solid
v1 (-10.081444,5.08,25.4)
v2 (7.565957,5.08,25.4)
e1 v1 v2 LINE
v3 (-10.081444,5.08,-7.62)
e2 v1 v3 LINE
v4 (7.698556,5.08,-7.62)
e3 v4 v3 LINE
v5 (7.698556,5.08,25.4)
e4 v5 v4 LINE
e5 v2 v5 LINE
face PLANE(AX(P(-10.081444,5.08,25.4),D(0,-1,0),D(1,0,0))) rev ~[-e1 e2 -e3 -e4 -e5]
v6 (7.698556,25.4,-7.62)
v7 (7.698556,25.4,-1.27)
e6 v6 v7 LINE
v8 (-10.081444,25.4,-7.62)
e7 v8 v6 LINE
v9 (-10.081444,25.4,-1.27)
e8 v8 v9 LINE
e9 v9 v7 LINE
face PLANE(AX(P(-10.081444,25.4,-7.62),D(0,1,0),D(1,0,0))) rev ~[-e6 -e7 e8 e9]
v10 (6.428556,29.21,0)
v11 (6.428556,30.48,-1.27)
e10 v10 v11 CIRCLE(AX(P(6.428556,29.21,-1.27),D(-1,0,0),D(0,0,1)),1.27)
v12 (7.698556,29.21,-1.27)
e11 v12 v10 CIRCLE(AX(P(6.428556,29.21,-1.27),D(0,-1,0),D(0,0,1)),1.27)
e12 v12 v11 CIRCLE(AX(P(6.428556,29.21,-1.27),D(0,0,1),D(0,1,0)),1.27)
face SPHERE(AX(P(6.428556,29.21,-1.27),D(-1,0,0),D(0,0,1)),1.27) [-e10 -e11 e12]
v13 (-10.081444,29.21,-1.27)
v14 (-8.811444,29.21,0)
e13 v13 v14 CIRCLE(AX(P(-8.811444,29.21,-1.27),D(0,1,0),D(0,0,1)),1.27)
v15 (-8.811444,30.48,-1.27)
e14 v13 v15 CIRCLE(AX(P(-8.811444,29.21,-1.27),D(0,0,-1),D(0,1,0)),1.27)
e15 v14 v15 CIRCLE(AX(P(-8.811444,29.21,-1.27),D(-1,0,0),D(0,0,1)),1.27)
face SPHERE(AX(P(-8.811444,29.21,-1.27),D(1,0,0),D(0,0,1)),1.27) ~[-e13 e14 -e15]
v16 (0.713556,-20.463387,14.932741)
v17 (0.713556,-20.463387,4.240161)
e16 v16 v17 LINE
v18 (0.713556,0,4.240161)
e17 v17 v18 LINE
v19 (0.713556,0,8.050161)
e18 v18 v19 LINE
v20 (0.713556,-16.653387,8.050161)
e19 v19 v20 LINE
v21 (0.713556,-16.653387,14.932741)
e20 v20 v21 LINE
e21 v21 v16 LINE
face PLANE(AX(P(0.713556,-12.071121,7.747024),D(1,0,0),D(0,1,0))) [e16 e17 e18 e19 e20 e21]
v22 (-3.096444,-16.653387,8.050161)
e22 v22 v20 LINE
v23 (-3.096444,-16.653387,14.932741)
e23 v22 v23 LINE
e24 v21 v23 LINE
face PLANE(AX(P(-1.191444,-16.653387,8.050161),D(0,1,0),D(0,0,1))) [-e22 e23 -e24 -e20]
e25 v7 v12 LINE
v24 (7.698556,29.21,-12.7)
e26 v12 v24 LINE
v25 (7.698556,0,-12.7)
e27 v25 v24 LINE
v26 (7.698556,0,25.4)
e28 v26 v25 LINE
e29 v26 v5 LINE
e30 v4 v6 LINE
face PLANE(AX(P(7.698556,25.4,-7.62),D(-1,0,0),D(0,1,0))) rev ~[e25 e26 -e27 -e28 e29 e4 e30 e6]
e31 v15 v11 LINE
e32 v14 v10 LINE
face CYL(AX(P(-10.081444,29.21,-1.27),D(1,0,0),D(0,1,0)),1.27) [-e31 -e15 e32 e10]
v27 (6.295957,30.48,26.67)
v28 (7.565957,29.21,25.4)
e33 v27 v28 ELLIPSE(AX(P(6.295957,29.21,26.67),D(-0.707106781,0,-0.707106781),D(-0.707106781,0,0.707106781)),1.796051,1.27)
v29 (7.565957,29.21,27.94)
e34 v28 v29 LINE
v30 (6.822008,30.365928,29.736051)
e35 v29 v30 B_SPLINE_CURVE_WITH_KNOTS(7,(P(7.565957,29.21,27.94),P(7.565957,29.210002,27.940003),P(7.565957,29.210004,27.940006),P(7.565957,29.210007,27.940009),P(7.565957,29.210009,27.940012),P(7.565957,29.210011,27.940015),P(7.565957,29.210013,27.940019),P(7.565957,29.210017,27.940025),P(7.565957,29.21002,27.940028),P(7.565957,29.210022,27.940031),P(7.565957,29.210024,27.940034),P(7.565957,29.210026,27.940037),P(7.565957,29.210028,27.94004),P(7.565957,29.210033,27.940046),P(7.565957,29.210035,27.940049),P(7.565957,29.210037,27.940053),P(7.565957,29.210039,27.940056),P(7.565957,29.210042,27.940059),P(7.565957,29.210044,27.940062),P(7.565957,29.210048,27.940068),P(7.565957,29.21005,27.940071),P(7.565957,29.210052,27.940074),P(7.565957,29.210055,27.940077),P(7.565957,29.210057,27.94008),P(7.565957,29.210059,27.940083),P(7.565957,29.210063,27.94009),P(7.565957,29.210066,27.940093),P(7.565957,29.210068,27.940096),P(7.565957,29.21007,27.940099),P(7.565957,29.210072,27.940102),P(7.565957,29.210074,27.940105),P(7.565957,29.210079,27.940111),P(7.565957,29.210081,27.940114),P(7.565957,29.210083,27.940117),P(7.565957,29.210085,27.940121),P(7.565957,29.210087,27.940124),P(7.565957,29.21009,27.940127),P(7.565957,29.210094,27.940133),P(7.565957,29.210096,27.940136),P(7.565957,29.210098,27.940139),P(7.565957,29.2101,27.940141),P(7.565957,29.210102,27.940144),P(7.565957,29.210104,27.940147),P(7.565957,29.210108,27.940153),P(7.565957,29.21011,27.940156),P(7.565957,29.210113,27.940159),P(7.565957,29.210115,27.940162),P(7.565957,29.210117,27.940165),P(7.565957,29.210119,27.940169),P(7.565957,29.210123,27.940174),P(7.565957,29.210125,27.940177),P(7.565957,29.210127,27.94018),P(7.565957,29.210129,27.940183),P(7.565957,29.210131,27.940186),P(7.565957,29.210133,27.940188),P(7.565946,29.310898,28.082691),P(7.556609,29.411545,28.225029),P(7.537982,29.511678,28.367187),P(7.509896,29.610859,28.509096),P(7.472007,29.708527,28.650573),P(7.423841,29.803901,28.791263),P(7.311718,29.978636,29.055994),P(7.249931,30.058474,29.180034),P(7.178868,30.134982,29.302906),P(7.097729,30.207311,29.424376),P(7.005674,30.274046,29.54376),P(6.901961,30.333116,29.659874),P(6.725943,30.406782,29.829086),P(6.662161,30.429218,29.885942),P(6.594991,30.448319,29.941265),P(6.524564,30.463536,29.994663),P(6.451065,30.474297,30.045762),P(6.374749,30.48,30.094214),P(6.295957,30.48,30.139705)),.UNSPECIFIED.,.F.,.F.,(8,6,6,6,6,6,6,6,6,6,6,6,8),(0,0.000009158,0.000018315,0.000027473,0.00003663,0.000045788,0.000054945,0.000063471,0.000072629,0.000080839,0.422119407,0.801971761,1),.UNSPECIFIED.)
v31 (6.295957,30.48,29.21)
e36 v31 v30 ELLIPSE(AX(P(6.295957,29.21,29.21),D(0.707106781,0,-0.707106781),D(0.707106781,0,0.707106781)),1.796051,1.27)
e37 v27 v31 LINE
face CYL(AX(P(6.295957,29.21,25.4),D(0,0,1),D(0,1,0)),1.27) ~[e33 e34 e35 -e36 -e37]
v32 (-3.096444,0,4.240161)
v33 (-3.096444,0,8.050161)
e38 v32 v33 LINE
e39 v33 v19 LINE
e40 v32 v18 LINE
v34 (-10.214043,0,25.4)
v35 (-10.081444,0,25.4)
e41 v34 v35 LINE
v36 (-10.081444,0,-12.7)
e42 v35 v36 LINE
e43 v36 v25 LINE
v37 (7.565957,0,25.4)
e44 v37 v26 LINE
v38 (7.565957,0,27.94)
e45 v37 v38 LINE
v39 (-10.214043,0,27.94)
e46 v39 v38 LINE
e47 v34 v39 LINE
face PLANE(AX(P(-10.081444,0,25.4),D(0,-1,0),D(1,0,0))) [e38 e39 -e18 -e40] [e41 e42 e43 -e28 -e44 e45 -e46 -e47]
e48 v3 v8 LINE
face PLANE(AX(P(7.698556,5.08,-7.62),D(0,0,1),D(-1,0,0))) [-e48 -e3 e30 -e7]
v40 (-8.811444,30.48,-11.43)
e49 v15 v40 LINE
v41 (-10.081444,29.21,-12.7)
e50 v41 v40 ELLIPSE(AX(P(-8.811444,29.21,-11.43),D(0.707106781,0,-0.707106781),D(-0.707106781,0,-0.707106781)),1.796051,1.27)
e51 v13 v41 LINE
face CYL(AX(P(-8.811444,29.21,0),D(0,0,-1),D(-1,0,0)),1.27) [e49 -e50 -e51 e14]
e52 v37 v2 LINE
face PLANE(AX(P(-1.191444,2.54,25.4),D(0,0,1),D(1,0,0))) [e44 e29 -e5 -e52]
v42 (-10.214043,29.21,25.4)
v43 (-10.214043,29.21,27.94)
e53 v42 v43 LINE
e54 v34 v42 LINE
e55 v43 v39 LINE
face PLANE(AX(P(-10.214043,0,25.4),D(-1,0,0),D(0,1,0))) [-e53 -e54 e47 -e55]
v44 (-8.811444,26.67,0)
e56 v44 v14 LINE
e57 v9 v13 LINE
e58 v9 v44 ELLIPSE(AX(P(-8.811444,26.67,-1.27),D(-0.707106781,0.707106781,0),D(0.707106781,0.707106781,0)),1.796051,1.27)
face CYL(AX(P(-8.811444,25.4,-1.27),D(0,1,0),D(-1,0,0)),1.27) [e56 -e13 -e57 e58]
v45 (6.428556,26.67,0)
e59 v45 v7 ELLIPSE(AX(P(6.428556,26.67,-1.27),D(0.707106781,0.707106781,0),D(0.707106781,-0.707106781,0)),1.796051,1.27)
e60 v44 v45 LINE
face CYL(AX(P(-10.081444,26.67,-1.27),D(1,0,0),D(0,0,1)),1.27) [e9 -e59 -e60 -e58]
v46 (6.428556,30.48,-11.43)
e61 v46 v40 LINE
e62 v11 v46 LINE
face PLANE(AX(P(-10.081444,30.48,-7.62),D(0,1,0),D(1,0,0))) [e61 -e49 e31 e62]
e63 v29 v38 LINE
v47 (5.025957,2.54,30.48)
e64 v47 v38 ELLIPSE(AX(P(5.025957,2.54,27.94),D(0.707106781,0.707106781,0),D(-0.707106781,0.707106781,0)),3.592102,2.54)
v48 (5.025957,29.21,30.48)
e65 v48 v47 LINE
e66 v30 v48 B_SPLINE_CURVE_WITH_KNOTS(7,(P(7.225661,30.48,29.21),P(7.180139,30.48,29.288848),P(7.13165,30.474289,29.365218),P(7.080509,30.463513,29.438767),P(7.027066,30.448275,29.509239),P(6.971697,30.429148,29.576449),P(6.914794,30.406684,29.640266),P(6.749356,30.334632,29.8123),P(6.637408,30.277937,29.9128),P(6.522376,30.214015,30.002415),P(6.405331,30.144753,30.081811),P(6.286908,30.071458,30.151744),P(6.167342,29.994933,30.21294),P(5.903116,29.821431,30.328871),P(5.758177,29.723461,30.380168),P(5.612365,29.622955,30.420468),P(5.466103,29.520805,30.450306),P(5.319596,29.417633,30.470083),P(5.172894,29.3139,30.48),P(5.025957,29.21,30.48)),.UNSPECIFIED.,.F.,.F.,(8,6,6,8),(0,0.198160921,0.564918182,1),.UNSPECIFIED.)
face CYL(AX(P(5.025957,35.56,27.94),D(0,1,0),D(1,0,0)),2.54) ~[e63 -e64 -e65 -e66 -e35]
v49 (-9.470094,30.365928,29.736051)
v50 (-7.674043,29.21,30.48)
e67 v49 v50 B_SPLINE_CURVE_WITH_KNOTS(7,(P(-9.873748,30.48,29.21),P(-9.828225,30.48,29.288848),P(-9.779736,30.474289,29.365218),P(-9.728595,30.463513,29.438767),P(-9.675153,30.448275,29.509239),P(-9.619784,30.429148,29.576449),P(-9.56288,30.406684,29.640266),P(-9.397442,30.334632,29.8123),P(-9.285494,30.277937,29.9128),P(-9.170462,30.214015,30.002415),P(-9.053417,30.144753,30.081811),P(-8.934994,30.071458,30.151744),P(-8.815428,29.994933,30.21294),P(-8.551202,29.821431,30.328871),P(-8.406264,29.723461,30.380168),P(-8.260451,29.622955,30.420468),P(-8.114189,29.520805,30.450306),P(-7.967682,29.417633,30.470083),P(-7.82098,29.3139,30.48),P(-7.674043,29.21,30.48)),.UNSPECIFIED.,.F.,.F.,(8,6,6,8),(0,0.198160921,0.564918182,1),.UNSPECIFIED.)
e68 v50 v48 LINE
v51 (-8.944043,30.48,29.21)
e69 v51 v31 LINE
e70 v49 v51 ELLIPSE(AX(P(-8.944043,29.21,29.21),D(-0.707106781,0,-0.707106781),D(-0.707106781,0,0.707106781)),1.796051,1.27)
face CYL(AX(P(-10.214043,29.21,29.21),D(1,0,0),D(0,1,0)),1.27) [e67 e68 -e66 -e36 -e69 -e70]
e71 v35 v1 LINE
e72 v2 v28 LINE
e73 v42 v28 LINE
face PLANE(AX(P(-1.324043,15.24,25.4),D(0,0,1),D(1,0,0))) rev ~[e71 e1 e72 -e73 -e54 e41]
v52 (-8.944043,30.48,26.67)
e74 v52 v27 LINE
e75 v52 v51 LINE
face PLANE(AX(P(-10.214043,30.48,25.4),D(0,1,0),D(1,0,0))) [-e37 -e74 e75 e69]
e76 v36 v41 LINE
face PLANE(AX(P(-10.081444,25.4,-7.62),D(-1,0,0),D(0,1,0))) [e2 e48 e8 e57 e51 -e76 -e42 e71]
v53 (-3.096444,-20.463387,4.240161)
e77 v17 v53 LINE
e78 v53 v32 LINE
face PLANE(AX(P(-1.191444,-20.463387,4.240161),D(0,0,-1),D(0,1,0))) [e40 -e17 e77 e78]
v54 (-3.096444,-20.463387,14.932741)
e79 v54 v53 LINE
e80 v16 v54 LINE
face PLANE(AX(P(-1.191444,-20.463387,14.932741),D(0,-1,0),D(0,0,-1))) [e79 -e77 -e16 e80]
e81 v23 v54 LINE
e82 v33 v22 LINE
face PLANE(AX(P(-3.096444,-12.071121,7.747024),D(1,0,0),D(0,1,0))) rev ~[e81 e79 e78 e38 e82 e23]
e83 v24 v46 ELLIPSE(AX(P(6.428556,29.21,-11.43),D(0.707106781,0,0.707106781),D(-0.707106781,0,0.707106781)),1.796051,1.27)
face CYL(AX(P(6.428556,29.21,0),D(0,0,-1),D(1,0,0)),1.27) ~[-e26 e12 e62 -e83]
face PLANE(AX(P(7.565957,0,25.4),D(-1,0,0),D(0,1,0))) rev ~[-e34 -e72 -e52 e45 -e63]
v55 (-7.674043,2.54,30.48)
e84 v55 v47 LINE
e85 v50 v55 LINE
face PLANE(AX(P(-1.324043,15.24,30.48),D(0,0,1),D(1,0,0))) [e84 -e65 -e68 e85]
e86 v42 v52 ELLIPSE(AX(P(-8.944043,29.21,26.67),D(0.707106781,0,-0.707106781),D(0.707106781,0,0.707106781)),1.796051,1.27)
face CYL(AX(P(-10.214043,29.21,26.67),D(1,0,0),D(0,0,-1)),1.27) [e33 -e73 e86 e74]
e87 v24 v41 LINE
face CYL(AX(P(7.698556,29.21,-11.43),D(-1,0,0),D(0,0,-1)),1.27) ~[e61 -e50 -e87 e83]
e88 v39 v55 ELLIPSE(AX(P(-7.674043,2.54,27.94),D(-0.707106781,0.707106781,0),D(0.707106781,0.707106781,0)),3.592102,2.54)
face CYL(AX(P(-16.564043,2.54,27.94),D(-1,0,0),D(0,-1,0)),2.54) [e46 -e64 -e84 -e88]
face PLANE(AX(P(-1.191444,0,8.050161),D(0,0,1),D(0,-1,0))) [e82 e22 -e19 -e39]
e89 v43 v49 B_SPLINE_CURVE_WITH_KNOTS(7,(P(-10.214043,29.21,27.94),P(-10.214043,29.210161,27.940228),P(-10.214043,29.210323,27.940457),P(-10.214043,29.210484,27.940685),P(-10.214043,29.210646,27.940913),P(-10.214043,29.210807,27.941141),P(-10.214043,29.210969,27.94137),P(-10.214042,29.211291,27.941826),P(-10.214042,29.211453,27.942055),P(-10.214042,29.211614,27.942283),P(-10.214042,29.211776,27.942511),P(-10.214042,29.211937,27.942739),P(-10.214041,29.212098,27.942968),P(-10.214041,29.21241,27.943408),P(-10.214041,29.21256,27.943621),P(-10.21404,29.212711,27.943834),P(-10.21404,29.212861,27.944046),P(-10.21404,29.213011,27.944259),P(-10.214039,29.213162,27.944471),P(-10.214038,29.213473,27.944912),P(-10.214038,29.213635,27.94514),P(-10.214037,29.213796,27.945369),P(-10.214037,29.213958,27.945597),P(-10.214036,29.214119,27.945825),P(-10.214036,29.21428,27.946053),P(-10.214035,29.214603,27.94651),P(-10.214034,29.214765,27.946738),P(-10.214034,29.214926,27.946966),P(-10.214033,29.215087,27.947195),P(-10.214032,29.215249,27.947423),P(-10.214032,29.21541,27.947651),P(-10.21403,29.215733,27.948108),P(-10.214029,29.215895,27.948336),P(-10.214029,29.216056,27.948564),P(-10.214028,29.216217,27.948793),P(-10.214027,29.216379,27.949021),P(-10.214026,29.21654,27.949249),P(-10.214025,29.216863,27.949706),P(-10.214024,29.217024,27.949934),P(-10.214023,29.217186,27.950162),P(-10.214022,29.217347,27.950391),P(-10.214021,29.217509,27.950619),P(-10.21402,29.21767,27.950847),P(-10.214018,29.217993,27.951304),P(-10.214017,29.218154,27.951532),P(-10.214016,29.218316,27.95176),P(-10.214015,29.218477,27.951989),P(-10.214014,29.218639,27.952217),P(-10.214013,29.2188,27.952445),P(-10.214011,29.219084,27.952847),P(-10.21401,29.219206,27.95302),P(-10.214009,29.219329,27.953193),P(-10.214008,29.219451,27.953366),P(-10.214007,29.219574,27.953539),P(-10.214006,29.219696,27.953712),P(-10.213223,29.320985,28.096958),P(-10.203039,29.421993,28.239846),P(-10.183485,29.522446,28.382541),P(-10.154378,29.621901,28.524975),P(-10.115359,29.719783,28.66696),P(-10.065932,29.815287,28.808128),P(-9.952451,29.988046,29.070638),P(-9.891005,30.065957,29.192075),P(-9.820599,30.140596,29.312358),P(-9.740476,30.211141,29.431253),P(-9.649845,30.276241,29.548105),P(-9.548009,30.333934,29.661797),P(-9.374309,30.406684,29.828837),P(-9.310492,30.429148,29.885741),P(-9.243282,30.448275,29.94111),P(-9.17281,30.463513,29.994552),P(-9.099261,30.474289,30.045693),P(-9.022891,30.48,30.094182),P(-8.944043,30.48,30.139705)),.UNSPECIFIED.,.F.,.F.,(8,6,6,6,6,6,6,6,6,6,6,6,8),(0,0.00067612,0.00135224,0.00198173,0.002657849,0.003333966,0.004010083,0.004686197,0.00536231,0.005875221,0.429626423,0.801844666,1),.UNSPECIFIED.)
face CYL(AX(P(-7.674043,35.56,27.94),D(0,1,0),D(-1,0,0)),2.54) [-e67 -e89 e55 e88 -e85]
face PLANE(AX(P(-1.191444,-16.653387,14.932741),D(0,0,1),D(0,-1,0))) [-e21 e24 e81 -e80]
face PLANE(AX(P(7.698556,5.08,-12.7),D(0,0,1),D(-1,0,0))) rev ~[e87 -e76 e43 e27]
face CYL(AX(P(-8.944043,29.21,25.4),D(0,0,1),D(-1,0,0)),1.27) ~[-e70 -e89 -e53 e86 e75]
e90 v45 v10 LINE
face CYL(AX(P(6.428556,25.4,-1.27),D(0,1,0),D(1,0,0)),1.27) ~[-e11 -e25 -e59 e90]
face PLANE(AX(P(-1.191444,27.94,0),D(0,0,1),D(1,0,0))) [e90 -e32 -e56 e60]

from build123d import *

# Parameters (mm, degrees)
F1_W         = 17.78
F1_H         = 30.48
F2_DEPTH     = 5.08
F3_W         = 17.78
F3_H         = 5.08
F4_DEPTH     = 38.1
F6_W         = 17.78
F6_H         = 5.08
F7_DEPTH     = 25.4
F9_W         = 17.78
F9_H         = 5.08
F10_DEPTH    = 7.62
F11_R        = 1.27
F12_R        = 1.27
F13_T1_DEPTH = 41.91
F13_T3_DEPTH = 30.48
F16_DEPTH    = 1.905


# Not quite as in the source:
# - a fillet or chamfer that OpenCascade refuses, or shapes differently, is made with other operations: its cross-section is extruded or revolved along the edge and cut away or added


with BuildPart() as f2:
    # F1 (on offset) → F2 (new body)
    with BuildSketch(Plane.XY.offset(25.4)):
        with Locations((-1.3240431021, 15.24)):
            Rectangle(F1_W, F1_H)
    extrude(amount=F2_DEPTH)

    # F3 (on offset) → F4 (join)
    with BuildSketch(Plane.XY.offset(25.4)):
        with Locations((-1.1914440245, 2.54)):
            Rectangle(F3_W, F3_H)
    extrude(amount=-F4_DEPTH)

    # F6 (on offset) → F7 (join)
    with BuildSketch(Plane(origin=(0, 5.08, 0), x_dir=(-1, 0, 0), z_dir=(0, 1, 0))):
        with Locations((1.1914440245, -10.16)):
            Rectangle(F6_W, F6_H)
    extrude(amount=F7_DEPTH)

    # F9 (on offset) → F10 (join)
    with BuildSketch(Plane.XY.offset(-7.62)):
        with Locations((-1.1914440245, 27.94)):
            Rectangle(F9_W, F9_H)
    extrude(amount=F10_DEPTH)

    # F11
    f11_edges = [f2.edges().sort_by_distance(p)[0] for p in [
        (-1.191444, 30.48, 0),
        (-10.081444, 27.94, 0),
        (-1.191444, 25.4, 0),
        (7.698556, 27.94, 0),
        (-1.191444, 30.48, -12.7),
        (-10.081444, 30.48, -6.35),
        (7.698556, 30.48, -6.35),
    ]]
    fillet(f11_edges, radius=F11_R)

    # F12
    f12_edges = [f2.edges().sort_by_distance(p)[0] for p in [
        (7.565957, 30.48, 27.94),
        (-10.214043, 30.48, 27.94),
        (-1.324043, 30.48, 25.4),
        (-1.324043, 30.48, 30.48),
    ]]
    fillet(f12_edges, radius=F12_R)

    # F13: fillet of radius 2.54 on 4 edges, made by hand

    # F13_s2 → F13_t1 (cut)
    with BuildSketch(Plane.XZ.offset(-35.56)):
        with BuildLine():
            ThreePointArc((-10.2140431021, 27.94), (-9.4700943263, 29.7360512242), (-7.6740431021, 30.48))
            Line((-7.6740431021, 30.48), (-10.2140431021, 30.48))
            Line((-10.2140431021, 30.48), (-10.2140431021, 27.94))
        make_face()
        with BuildLine():
            ThreePointArc((7.5659568979, 27.94), (6.8220081221, 29.7360512242), (5.0259568979, 30.48))
            Line((5.0259568979, 30.48), (7.5659568979, 30.48))
            Line((7.5659568979, 30.48), (7.5659568979, 27.94))
        make_face()
    extrude(amount=F13_T1_DEPTH, mode=Mode.SUBTRACT)

    # F13_s4 → F13_t3 (cut)
    with BuildSketch(Plane.YZ.offset(-16.5640431021)):
        with BuildLine():
            ThreePointArc((0, 27.94), (0.7439487758, 29.7360512242), (2.54, 30.48))
            Line((2.54, 30.48), (0, 30.48))
            Line((0, 30.48), (0, 27.94))
        make_face()
    extrude(amount=F13_T3_DEPTH, mode=Mode.SUBTRACT)

    # F15 (on offset) → F16 (join, symmetric)
    with BuildSketch(Plane.YZ.offset(-1.1914440245)):
        Polygon((-20.4633865505, 4.2401612736), (0, 4.2401612736), (0, 8.0501612736), (-16.6533865505, 8.0501612736), (-16.6533865505, 14.932741411), (-20.4633865505, 14.932741411), align=None)
    extrude(amount=F16_DEPTH, both=True)


solid = f2.part
